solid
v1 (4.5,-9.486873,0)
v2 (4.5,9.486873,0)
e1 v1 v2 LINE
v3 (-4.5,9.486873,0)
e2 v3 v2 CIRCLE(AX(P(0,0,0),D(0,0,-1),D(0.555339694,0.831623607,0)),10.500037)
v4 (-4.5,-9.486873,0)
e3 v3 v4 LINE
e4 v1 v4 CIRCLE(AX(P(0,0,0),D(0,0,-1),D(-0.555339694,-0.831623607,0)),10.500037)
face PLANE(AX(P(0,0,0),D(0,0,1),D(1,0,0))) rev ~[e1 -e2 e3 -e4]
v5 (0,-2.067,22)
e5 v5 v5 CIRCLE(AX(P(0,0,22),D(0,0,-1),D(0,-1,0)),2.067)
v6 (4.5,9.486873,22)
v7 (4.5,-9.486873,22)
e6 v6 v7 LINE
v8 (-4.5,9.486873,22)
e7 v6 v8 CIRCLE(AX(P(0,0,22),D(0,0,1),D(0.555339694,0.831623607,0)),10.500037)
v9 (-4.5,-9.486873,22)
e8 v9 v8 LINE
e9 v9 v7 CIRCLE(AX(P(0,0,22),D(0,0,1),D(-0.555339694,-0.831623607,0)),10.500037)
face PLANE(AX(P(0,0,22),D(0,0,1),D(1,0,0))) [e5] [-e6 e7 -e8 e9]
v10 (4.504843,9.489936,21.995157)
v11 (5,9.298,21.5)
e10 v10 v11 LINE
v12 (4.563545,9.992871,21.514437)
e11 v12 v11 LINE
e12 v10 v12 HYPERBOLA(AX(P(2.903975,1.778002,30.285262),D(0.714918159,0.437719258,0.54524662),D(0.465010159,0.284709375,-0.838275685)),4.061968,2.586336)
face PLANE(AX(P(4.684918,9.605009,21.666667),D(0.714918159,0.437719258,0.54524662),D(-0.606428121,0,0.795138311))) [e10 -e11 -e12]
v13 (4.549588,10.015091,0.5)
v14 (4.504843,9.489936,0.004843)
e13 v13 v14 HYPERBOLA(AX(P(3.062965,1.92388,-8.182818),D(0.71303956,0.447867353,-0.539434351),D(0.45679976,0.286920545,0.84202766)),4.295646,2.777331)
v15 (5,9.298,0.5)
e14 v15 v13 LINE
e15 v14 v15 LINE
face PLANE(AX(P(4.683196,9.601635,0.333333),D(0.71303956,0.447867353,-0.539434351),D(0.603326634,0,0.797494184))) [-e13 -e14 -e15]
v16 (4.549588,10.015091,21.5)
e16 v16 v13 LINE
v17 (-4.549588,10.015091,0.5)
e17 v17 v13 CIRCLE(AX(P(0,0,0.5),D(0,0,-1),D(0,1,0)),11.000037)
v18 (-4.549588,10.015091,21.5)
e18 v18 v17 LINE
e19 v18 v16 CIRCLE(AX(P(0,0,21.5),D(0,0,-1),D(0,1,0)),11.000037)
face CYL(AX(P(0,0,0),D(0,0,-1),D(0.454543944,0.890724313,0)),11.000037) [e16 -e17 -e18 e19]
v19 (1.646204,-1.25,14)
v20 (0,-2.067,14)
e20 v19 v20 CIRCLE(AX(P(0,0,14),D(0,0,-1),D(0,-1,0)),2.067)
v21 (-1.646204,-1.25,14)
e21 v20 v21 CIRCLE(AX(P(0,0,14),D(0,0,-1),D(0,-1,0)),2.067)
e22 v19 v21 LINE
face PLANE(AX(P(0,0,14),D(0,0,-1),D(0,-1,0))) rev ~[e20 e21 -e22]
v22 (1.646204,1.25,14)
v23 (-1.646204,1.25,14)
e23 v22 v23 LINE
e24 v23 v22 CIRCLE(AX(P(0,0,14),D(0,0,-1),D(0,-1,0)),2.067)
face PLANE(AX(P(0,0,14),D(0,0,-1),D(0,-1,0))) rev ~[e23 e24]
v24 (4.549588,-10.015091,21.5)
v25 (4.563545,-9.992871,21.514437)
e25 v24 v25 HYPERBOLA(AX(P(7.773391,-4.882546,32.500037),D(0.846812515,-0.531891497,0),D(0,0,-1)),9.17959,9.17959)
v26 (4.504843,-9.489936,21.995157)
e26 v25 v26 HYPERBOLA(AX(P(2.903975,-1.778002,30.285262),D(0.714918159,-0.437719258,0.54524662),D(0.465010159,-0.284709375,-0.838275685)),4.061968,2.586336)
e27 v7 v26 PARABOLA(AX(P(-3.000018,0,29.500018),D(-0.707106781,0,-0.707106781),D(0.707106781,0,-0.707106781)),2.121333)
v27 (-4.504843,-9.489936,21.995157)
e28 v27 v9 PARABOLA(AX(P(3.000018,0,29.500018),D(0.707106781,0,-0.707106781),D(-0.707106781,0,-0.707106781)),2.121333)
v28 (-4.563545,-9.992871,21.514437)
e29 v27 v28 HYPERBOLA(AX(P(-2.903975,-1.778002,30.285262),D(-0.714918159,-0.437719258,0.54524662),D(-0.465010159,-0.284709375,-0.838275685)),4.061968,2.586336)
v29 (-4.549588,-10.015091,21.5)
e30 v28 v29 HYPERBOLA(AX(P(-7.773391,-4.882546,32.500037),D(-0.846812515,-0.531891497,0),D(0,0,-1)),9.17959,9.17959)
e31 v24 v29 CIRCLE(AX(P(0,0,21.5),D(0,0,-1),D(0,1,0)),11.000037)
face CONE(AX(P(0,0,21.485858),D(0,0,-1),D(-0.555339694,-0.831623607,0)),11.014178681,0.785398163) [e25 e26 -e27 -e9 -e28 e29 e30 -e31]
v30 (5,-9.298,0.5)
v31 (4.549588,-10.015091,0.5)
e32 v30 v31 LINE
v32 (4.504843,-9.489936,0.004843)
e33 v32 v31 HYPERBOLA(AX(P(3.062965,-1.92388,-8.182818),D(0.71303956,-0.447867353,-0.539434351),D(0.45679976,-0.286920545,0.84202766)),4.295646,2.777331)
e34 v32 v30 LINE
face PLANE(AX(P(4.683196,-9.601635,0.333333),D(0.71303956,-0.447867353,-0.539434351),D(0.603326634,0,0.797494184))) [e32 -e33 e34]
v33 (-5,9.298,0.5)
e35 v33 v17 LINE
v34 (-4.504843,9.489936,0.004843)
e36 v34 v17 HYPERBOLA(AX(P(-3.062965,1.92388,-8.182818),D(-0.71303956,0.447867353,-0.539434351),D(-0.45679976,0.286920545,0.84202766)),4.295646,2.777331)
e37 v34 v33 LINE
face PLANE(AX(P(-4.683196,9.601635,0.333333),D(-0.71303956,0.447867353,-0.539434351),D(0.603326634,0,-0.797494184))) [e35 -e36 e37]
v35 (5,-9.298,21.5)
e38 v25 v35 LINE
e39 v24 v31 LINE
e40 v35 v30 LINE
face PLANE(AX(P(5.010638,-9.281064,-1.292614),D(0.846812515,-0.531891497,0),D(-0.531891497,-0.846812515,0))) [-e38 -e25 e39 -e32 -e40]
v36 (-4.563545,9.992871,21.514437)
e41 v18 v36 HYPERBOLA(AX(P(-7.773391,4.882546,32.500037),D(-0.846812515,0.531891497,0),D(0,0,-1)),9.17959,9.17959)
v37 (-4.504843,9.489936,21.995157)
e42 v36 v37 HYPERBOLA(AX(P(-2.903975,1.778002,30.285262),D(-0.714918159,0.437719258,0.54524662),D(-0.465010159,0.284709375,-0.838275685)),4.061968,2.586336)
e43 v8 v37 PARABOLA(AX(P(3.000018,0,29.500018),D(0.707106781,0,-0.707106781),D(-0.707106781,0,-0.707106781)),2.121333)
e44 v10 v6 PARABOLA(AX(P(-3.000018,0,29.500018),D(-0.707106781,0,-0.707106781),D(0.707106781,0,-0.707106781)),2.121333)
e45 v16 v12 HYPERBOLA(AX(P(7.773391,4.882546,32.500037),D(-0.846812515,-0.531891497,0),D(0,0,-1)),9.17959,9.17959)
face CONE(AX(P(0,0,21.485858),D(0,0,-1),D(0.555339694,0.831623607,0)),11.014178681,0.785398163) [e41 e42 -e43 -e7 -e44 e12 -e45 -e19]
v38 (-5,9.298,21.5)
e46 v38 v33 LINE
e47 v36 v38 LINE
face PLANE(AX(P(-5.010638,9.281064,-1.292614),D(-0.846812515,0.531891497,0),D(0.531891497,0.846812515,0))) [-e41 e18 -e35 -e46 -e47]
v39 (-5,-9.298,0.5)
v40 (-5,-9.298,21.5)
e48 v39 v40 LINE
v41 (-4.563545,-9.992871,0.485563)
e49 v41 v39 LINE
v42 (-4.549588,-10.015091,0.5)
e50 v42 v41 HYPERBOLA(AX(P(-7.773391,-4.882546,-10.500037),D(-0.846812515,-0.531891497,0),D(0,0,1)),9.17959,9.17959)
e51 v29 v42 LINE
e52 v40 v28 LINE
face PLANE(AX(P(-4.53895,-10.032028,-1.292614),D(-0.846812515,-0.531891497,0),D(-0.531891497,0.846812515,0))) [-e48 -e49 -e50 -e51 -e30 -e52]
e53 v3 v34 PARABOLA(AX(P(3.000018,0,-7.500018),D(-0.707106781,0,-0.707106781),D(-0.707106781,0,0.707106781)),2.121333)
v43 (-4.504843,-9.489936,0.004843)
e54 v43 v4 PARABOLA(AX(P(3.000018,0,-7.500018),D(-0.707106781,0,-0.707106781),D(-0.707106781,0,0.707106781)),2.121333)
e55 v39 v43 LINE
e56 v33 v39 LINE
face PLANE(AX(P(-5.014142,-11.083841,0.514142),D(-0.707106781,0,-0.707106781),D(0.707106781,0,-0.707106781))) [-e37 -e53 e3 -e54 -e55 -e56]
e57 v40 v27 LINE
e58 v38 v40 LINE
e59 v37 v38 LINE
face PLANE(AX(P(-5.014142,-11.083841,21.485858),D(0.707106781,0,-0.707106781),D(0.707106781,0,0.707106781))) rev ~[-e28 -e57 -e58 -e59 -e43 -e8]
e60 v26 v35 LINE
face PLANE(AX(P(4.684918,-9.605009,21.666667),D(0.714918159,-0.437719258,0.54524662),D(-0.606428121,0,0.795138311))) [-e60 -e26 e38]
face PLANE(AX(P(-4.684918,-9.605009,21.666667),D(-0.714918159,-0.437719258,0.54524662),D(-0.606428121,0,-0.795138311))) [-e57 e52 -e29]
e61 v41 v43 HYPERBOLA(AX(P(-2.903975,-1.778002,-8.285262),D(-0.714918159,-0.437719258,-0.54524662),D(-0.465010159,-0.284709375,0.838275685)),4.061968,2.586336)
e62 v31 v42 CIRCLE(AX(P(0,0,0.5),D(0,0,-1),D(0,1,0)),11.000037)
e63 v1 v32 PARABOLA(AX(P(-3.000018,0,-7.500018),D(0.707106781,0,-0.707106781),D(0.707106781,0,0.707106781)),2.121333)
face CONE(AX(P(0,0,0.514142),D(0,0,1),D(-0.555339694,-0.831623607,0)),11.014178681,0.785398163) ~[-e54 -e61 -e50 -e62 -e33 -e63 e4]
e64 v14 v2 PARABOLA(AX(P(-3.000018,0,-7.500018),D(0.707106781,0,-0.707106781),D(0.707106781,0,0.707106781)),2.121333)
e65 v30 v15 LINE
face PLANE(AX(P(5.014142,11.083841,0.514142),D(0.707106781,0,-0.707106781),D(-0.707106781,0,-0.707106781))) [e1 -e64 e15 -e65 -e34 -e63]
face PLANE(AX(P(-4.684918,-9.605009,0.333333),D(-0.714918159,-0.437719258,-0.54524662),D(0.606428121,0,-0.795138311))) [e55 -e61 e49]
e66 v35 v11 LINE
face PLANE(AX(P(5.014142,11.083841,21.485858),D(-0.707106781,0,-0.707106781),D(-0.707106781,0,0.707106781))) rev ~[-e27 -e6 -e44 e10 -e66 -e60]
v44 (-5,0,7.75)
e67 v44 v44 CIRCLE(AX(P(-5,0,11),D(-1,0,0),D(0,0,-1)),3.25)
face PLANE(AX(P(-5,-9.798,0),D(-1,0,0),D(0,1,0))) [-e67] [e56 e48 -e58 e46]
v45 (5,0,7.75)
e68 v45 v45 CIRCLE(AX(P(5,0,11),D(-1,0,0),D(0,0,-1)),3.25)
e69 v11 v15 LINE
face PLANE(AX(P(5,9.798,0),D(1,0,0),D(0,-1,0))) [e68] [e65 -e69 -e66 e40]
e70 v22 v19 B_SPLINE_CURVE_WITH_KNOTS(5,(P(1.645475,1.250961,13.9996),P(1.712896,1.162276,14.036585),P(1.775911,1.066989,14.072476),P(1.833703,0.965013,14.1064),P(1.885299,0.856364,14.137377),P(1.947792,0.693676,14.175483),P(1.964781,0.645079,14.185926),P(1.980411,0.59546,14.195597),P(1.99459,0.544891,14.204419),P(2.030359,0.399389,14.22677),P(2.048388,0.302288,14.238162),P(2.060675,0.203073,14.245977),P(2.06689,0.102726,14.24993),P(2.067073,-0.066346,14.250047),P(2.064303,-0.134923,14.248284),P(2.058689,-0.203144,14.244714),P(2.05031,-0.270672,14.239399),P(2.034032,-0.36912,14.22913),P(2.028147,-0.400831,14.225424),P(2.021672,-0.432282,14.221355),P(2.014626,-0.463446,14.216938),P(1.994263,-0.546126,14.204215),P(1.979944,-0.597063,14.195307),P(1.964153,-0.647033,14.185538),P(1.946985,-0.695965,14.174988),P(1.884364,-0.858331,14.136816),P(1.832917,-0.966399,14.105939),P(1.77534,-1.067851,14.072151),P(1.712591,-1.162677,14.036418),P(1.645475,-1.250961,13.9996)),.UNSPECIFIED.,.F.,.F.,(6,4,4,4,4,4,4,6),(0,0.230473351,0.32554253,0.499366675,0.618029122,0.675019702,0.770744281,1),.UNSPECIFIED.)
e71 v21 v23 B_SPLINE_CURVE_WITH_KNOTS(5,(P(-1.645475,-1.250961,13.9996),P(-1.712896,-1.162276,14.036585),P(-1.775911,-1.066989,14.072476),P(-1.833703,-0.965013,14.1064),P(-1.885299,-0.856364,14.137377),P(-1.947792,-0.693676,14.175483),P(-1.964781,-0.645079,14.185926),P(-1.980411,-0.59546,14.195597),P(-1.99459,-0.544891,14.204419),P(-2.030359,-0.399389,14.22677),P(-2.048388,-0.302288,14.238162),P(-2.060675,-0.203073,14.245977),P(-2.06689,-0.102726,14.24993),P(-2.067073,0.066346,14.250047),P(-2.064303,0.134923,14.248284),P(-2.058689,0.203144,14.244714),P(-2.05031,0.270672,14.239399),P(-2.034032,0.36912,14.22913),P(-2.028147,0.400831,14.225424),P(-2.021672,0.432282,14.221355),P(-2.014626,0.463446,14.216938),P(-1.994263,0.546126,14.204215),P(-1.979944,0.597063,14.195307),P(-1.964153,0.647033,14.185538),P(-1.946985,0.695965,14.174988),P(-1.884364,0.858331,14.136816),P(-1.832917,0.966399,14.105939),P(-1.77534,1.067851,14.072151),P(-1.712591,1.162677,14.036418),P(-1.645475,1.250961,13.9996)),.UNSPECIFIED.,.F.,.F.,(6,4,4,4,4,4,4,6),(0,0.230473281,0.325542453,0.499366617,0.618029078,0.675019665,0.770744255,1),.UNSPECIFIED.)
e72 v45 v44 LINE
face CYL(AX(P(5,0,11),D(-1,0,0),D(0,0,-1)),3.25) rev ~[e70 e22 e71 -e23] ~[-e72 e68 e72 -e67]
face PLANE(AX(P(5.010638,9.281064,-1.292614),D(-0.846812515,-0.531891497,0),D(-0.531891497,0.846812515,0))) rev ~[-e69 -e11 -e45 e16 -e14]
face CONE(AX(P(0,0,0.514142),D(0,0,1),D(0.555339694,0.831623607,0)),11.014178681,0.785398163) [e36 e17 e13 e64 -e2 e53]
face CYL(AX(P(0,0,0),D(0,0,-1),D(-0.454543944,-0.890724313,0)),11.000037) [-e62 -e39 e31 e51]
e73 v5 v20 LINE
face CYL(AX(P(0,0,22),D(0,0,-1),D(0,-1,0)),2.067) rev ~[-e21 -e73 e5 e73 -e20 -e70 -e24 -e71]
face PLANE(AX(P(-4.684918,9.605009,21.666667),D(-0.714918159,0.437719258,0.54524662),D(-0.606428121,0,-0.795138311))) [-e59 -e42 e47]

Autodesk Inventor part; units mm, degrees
ref_plane "YZ Plane" through (0, 0, 0) normal (1, 0, 0) x (0, 1, 0)
ref_plane "XZ Plane" through (0, 0, 0) normal (0, 1, 0) x (-1, 0, 0)
ref_plane "XY Plane" through (0, 0, 0) normal (0, 0, 1) x (1, 0, 0)
sketch "Sketch1" plane through (0, 0, 0) normal (0, 0, 1) x (1, 0, 0)
  line L0 (5, 9.798) -> (5, -9.798)
  line L1 (-5, -9.798) -> (-5, 9.798)
  arc A0 (-5, -9.798) -> (5, -9.798) centre (0, 0) ccw
  arc A1 (5, 9.798) -> (-5, 9.798) centre (0, 0) ccw
  point P0 (0, 12.4867)
  point P1 (5, 0)
  dimension "d1" = 10
  dimension "d2" = 11
  dimension "d3" = 11
  dimension "d4" = 5
  dimension "d5" = 12.4867
extrude "Extrusion1" add sketch "Sketch1" along normal blind 22
chamfer "Chamfer1" distance 0.5 angle 45 12 edges at (0, 11, 22) (5, 0, 22) (0, -11, 22) (-5, 0, 22) (5, 9.798, 11) (-5, 9.798, 11) (0, 11, 0) (5, 0, 0) (5, -9.798, 11) (0, -11, 0) (-5, 0, 0) (-5, -9.798, 11)
sketch "Sketch2" plane through (0, 0, 22) normal (0, 0, 1) x (1, 0, 0)
  arc A0 (4.5, 9.4868) -> (-4.5, 9.4868) centre (0, 0) ccw projected
hole "Hole1" at (0, 0, 22) direction (0, 0, -1) diameter 4.134 depth 8 thread size "M5x0.8" class "6H" standard "ANSI Metric M Profile"
sketch "Sketch3" plane through (5, -9.298, 0.5) normal (1, 0, 0) x (0, 0, -1)
  line L0 (-21, 18.5959) -> (0, 18.5959) projected
  line L1 (-21, 0) -> (-21, 18.5959) projected
  point P0 (0.5, 9.298)
  point P1 (-10.5, 9.298)
  point P2 (-21, 9.298)
  point P3 (-10.5, 18.5959)
hole "Hole2" at (5, 0, 11) direction (-1, 0, 0) diameter 6.5 end through all
properties part number "19 - Crosshead" material "Bronze, Soft Tin"
